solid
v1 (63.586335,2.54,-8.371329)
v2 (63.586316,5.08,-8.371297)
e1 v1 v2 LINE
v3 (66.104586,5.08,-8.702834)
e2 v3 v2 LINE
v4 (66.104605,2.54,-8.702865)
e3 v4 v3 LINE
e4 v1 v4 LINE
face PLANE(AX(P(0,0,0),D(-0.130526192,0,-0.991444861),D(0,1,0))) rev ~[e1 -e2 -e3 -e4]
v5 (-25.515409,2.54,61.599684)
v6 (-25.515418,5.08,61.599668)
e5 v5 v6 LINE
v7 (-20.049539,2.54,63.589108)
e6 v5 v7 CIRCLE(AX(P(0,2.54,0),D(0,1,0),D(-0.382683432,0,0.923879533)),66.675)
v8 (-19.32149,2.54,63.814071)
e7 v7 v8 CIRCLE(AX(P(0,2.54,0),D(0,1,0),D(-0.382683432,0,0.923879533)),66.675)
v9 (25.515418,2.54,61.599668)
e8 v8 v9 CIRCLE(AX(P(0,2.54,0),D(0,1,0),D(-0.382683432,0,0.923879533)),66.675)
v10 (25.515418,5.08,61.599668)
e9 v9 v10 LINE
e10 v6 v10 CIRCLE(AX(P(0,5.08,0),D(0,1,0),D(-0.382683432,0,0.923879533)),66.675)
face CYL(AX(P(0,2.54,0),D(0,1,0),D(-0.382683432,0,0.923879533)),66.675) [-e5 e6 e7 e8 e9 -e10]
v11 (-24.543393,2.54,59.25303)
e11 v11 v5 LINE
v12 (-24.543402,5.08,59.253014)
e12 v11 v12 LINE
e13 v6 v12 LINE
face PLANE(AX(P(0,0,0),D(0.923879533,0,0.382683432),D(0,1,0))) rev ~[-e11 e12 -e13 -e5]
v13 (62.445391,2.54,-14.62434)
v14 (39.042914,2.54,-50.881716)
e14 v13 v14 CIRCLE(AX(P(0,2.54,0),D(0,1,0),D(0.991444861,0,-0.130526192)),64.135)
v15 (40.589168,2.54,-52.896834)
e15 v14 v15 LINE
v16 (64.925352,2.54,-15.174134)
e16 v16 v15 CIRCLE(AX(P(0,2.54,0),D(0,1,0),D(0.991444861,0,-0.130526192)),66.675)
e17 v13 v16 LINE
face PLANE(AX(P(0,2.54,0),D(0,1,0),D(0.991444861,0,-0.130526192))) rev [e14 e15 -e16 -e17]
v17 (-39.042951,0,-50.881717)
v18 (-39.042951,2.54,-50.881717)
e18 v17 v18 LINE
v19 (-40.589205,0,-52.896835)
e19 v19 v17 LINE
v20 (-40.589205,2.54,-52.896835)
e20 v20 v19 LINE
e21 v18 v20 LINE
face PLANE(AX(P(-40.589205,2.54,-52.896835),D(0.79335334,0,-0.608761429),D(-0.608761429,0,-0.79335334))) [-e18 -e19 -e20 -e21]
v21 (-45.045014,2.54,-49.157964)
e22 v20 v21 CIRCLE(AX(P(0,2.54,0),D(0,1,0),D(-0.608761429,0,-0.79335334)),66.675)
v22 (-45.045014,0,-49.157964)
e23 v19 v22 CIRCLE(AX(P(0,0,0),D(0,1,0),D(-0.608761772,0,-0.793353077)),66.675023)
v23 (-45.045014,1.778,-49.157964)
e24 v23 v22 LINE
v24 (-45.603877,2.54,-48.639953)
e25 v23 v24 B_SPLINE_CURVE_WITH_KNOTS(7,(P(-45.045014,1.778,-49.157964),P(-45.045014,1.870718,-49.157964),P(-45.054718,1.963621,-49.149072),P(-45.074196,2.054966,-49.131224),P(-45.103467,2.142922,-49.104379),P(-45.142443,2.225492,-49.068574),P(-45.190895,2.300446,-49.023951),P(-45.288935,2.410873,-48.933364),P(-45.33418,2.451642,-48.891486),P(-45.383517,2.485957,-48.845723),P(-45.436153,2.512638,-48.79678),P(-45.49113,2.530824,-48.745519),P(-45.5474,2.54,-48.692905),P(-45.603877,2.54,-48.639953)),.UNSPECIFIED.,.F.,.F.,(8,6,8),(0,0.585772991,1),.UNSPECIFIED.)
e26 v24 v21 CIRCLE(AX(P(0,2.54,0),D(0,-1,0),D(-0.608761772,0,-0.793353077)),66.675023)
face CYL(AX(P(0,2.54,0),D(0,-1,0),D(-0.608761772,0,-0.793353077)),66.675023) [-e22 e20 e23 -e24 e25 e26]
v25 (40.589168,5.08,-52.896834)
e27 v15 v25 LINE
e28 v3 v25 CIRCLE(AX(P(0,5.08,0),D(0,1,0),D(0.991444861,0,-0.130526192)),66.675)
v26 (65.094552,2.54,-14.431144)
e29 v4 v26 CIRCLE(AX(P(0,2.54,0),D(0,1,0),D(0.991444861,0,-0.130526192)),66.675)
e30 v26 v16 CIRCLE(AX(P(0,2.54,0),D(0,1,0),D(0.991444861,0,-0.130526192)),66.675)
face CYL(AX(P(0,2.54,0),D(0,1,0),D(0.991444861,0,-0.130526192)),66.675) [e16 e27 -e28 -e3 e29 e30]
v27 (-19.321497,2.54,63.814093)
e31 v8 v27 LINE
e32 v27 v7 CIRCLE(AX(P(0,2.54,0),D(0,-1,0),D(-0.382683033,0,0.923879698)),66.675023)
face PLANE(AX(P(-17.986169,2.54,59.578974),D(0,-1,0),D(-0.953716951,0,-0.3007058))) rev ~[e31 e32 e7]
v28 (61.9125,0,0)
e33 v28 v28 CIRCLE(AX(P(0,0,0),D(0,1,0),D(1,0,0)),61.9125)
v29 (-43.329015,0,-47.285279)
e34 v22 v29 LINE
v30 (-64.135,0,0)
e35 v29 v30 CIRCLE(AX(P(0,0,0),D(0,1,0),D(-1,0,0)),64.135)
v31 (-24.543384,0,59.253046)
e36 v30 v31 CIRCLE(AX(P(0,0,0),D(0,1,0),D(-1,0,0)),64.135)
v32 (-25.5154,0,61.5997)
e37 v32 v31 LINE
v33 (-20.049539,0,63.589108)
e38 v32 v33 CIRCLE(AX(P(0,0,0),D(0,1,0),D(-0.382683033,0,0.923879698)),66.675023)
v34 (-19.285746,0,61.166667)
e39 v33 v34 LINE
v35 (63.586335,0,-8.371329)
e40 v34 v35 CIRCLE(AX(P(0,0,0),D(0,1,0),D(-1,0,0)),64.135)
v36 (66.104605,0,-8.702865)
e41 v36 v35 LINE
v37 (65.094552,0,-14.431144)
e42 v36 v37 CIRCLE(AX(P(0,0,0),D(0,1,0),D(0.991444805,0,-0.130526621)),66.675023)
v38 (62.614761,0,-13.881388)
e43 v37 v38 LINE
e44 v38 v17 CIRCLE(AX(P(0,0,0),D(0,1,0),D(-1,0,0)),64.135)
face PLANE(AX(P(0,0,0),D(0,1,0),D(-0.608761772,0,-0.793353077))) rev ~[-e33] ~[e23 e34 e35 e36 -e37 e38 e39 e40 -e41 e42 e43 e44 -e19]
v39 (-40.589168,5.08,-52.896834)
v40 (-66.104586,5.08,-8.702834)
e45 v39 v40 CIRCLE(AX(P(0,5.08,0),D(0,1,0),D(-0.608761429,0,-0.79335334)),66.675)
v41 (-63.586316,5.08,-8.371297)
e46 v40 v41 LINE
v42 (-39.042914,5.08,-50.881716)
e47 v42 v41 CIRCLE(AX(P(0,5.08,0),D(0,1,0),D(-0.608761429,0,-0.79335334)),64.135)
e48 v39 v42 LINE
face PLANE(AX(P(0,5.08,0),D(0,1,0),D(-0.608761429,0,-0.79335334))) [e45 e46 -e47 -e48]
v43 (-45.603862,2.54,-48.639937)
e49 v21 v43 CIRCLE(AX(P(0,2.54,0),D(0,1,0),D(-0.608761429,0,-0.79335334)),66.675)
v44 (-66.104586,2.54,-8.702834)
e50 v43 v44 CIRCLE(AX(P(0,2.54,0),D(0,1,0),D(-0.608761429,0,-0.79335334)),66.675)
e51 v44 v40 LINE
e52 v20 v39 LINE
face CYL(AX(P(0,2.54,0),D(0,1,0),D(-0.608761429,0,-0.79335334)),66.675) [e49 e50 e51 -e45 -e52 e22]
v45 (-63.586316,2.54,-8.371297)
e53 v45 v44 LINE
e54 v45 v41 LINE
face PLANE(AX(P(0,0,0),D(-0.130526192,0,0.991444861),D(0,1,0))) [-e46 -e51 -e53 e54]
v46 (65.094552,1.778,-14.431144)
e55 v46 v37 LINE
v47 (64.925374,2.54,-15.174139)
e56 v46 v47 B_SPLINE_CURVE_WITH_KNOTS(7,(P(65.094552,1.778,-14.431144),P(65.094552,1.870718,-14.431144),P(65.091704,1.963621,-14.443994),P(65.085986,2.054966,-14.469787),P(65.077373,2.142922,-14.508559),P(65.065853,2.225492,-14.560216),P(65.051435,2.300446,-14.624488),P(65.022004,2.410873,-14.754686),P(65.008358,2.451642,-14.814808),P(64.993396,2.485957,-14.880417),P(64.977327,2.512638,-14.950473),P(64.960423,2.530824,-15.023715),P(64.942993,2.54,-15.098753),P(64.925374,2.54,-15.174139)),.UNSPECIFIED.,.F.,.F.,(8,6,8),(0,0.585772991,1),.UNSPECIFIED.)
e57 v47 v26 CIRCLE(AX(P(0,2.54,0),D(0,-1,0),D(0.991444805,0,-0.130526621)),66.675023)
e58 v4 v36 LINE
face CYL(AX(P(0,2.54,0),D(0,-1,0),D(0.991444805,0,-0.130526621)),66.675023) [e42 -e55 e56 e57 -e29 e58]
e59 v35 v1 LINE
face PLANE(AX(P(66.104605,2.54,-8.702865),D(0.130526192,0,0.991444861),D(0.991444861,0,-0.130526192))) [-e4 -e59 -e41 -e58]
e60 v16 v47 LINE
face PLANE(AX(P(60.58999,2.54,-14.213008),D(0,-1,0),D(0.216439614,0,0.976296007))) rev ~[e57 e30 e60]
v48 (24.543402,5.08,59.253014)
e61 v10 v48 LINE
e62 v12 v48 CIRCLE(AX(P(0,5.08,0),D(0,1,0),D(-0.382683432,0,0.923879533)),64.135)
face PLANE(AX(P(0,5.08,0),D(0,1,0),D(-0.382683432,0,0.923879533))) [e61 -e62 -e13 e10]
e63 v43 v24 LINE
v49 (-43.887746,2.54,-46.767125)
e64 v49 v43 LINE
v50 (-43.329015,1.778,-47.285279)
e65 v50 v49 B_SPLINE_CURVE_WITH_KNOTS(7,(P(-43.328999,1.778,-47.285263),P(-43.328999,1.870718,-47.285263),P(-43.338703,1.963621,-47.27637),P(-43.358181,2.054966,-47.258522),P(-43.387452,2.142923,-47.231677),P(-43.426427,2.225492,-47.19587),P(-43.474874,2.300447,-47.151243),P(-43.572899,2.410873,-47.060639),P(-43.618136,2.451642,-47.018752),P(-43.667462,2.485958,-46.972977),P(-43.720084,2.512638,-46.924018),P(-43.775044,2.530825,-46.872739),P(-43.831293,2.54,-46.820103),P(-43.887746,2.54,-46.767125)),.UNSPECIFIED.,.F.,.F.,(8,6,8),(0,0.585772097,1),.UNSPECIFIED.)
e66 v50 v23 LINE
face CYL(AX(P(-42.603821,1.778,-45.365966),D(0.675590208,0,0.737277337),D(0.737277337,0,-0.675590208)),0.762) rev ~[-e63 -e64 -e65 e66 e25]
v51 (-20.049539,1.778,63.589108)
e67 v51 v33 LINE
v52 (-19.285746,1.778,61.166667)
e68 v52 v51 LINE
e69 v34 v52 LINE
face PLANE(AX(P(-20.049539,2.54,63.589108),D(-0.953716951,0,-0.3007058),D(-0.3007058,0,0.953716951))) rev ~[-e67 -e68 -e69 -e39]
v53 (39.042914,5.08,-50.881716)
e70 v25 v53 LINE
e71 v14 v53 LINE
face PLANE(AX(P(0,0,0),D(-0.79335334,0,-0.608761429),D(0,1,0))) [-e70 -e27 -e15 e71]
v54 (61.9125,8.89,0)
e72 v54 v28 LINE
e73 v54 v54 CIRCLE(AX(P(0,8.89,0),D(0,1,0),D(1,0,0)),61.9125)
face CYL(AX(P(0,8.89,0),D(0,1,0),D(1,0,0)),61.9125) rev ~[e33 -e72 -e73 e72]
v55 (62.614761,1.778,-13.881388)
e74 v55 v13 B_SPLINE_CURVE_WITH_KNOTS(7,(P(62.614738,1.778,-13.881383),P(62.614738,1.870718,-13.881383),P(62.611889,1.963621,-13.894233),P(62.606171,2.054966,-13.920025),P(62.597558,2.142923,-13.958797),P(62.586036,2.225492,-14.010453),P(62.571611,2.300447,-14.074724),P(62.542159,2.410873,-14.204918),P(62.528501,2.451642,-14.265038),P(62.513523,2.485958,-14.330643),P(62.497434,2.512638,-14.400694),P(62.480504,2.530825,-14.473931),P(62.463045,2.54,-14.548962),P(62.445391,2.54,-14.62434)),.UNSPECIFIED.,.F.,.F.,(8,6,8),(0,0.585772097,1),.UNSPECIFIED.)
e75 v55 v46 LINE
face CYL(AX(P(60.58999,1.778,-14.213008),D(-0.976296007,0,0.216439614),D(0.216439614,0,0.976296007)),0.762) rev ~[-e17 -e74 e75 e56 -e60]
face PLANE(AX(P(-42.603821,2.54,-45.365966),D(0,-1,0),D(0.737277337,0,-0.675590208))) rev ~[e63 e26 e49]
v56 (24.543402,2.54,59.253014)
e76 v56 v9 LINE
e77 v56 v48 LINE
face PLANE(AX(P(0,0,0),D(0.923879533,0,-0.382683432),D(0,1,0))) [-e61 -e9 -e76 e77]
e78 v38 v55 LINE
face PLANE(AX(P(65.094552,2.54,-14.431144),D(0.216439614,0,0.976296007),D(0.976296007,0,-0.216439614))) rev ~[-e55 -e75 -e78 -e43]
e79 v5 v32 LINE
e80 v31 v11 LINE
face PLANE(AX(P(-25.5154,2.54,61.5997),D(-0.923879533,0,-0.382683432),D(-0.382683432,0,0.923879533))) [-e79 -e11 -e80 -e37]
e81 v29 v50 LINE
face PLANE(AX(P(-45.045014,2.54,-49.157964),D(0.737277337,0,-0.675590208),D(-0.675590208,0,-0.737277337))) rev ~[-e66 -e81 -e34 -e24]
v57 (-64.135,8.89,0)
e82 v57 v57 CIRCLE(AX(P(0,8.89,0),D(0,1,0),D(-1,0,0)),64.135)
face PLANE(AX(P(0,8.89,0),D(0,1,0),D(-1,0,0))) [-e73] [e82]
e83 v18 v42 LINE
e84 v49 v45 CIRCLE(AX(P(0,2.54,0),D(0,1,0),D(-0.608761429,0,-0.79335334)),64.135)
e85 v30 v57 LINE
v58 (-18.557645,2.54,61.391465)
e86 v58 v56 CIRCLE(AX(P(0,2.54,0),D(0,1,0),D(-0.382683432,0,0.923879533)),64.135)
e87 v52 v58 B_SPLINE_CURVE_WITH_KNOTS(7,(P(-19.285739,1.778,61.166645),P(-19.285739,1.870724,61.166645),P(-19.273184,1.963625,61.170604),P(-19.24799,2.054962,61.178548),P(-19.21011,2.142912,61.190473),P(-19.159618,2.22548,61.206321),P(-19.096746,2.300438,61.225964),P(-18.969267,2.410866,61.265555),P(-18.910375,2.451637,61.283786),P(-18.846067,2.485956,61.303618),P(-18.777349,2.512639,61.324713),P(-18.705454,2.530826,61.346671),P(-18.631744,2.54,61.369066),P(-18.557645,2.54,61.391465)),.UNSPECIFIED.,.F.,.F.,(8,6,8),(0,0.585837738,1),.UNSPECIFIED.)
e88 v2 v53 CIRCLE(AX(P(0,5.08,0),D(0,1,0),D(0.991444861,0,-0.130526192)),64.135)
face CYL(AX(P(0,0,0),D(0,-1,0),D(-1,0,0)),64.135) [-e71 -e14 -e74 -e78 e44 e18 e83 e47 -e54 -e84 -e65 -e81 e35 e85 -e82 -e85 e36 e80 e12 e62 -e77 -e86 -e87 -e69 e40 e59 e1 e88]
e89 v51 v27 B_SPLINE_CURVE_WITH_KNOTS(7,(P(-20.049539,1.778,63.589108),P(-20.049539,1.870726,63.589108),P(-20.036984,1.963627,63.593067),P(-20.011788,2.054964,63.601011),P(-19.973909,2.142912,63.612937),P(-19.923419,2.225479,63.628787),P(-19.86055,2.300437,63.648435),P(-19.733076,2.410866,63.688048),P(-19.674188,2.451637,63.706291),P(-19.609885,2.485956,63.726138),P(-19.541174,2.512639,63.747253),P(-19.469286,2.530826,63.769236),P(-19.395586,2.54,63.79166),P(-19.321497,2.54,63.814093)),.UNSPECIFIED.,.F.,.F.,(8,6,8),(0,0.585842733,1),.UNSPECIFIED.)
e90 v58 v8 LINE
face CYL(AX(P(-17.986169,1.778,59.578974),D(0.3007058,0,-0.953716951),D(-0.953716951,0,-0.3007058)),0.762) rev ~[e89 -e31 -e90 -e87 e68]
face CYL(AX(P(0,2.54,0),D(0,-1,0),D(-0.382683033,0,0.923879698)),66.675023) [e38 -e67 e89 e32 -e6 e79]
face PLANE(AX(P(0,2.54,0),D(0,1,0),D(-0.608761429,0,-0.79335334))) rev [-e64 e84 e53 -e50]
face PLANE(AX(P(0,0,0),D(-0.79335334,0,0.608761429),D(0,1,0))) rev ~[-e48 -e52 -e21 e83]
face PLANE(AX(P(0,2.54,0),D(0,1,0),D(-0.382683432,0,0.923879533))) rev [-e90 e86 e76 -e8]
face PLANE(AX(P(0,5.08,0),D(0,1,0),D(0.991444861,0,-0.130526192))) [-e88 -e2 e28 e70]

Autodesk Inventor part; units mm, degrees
ref_plane "YZ Plane" through (0, 0, 0) normal (1, 0, 0) x (0, 1, 0)
ref_plane "XZ Plane" through (0, 0, 0) normal (0, 1, 0) x (-1, 0, 0)
ref_plane "XY Plane" through (0, 0, 0) normal (0, 0, 1) x (1, 0, 0)
sketch "Sketch1" plane through (0, 0, 0) normal (0, 1, 0) x (-1, 0, 0)
  circle A0 centre (0, 0) radius 64.135
  dimension "d0" = 128.27
extrude "Extrusion1" add sketch "Sketch1" along normal blind 8.89
sketch "Sketch2" plane through (0, 8.89, 0) normal (0, 1, 0) x (1, 0, 0)
  circle A0 centre (0, 0) radius 61.9125
  dimension "d3" = 123.825
extrude "Extrusion2" cut sketch "Sketch2" against normal through all
sketch "Sketch4" plane through (0, 0, 0) normal (1, 0, 0) x (0, 1, 0)
  line L0 (0, 64.135) -> (8.89, 64.135) projected
  line L1 (0, 64.135) -> (2.54, 64.135)
  line L2 (2.54, 64.135) -> (2.54, 66.675)
  line L3 (2.54, 66.675) -> (5.08, 66.675)
  line L4 (5.08, 66.675) -> (5.08, 64.135)
  line L5 (5.08, 64.135) -> (2.54, 64.135)
  line L6 (-1.778, 0) -> (10.668, 0) projected
  point P0 (0, 0)
  dimension "d17" = 2.54
  dimension "d18" = 2.54
  dimension "d19" = 2.54
revolve "Revolution1" add sketch "Sketch4" angle 45 mid plane about axis through (0, -10, 0) along (0, 1, 0)
sketch "Sketch6" plane through (-25.5154, 2.54, 61.5997) normal (-0.9238795, 0, -0.3826834) x (-0.3826834, 0, 0.9238795)
  line L0 (-2.54, 0) -> (-2.54, 2.54) projected
  line L1 (-2.54, 0) -> (0, 0)
  line L2 (0, 0) -> (0, -2.54)
  line L3 (0, -2.54) -> (-2.54, -2.54)
  line L4 (-2.54, -2.54) -> (-2.54, 0)
  line L5 (-66.675, -4.318) -> (-66.675, 8.128) projected
  point P0 (-66.675, -2.54)
  dimension "d21" = 2.54
  dimension "d22" = 2.54
revolve "Revolution2" add sketch "Sketch6" angle 5 about axis through (0, -10, 0) along (0, 1, 0)
fillet "Fillet3" radius 0.762 1 edges at (-19.6677, 2.54, 62.3779)
pattern_circular "Circular Pattern1" count 3 over 360 about axis through (0, -10, 0) along (0, 1, 0) of "Revolution1", "Revolution2", "Fillet3"
properties part number "bottom_thread"
